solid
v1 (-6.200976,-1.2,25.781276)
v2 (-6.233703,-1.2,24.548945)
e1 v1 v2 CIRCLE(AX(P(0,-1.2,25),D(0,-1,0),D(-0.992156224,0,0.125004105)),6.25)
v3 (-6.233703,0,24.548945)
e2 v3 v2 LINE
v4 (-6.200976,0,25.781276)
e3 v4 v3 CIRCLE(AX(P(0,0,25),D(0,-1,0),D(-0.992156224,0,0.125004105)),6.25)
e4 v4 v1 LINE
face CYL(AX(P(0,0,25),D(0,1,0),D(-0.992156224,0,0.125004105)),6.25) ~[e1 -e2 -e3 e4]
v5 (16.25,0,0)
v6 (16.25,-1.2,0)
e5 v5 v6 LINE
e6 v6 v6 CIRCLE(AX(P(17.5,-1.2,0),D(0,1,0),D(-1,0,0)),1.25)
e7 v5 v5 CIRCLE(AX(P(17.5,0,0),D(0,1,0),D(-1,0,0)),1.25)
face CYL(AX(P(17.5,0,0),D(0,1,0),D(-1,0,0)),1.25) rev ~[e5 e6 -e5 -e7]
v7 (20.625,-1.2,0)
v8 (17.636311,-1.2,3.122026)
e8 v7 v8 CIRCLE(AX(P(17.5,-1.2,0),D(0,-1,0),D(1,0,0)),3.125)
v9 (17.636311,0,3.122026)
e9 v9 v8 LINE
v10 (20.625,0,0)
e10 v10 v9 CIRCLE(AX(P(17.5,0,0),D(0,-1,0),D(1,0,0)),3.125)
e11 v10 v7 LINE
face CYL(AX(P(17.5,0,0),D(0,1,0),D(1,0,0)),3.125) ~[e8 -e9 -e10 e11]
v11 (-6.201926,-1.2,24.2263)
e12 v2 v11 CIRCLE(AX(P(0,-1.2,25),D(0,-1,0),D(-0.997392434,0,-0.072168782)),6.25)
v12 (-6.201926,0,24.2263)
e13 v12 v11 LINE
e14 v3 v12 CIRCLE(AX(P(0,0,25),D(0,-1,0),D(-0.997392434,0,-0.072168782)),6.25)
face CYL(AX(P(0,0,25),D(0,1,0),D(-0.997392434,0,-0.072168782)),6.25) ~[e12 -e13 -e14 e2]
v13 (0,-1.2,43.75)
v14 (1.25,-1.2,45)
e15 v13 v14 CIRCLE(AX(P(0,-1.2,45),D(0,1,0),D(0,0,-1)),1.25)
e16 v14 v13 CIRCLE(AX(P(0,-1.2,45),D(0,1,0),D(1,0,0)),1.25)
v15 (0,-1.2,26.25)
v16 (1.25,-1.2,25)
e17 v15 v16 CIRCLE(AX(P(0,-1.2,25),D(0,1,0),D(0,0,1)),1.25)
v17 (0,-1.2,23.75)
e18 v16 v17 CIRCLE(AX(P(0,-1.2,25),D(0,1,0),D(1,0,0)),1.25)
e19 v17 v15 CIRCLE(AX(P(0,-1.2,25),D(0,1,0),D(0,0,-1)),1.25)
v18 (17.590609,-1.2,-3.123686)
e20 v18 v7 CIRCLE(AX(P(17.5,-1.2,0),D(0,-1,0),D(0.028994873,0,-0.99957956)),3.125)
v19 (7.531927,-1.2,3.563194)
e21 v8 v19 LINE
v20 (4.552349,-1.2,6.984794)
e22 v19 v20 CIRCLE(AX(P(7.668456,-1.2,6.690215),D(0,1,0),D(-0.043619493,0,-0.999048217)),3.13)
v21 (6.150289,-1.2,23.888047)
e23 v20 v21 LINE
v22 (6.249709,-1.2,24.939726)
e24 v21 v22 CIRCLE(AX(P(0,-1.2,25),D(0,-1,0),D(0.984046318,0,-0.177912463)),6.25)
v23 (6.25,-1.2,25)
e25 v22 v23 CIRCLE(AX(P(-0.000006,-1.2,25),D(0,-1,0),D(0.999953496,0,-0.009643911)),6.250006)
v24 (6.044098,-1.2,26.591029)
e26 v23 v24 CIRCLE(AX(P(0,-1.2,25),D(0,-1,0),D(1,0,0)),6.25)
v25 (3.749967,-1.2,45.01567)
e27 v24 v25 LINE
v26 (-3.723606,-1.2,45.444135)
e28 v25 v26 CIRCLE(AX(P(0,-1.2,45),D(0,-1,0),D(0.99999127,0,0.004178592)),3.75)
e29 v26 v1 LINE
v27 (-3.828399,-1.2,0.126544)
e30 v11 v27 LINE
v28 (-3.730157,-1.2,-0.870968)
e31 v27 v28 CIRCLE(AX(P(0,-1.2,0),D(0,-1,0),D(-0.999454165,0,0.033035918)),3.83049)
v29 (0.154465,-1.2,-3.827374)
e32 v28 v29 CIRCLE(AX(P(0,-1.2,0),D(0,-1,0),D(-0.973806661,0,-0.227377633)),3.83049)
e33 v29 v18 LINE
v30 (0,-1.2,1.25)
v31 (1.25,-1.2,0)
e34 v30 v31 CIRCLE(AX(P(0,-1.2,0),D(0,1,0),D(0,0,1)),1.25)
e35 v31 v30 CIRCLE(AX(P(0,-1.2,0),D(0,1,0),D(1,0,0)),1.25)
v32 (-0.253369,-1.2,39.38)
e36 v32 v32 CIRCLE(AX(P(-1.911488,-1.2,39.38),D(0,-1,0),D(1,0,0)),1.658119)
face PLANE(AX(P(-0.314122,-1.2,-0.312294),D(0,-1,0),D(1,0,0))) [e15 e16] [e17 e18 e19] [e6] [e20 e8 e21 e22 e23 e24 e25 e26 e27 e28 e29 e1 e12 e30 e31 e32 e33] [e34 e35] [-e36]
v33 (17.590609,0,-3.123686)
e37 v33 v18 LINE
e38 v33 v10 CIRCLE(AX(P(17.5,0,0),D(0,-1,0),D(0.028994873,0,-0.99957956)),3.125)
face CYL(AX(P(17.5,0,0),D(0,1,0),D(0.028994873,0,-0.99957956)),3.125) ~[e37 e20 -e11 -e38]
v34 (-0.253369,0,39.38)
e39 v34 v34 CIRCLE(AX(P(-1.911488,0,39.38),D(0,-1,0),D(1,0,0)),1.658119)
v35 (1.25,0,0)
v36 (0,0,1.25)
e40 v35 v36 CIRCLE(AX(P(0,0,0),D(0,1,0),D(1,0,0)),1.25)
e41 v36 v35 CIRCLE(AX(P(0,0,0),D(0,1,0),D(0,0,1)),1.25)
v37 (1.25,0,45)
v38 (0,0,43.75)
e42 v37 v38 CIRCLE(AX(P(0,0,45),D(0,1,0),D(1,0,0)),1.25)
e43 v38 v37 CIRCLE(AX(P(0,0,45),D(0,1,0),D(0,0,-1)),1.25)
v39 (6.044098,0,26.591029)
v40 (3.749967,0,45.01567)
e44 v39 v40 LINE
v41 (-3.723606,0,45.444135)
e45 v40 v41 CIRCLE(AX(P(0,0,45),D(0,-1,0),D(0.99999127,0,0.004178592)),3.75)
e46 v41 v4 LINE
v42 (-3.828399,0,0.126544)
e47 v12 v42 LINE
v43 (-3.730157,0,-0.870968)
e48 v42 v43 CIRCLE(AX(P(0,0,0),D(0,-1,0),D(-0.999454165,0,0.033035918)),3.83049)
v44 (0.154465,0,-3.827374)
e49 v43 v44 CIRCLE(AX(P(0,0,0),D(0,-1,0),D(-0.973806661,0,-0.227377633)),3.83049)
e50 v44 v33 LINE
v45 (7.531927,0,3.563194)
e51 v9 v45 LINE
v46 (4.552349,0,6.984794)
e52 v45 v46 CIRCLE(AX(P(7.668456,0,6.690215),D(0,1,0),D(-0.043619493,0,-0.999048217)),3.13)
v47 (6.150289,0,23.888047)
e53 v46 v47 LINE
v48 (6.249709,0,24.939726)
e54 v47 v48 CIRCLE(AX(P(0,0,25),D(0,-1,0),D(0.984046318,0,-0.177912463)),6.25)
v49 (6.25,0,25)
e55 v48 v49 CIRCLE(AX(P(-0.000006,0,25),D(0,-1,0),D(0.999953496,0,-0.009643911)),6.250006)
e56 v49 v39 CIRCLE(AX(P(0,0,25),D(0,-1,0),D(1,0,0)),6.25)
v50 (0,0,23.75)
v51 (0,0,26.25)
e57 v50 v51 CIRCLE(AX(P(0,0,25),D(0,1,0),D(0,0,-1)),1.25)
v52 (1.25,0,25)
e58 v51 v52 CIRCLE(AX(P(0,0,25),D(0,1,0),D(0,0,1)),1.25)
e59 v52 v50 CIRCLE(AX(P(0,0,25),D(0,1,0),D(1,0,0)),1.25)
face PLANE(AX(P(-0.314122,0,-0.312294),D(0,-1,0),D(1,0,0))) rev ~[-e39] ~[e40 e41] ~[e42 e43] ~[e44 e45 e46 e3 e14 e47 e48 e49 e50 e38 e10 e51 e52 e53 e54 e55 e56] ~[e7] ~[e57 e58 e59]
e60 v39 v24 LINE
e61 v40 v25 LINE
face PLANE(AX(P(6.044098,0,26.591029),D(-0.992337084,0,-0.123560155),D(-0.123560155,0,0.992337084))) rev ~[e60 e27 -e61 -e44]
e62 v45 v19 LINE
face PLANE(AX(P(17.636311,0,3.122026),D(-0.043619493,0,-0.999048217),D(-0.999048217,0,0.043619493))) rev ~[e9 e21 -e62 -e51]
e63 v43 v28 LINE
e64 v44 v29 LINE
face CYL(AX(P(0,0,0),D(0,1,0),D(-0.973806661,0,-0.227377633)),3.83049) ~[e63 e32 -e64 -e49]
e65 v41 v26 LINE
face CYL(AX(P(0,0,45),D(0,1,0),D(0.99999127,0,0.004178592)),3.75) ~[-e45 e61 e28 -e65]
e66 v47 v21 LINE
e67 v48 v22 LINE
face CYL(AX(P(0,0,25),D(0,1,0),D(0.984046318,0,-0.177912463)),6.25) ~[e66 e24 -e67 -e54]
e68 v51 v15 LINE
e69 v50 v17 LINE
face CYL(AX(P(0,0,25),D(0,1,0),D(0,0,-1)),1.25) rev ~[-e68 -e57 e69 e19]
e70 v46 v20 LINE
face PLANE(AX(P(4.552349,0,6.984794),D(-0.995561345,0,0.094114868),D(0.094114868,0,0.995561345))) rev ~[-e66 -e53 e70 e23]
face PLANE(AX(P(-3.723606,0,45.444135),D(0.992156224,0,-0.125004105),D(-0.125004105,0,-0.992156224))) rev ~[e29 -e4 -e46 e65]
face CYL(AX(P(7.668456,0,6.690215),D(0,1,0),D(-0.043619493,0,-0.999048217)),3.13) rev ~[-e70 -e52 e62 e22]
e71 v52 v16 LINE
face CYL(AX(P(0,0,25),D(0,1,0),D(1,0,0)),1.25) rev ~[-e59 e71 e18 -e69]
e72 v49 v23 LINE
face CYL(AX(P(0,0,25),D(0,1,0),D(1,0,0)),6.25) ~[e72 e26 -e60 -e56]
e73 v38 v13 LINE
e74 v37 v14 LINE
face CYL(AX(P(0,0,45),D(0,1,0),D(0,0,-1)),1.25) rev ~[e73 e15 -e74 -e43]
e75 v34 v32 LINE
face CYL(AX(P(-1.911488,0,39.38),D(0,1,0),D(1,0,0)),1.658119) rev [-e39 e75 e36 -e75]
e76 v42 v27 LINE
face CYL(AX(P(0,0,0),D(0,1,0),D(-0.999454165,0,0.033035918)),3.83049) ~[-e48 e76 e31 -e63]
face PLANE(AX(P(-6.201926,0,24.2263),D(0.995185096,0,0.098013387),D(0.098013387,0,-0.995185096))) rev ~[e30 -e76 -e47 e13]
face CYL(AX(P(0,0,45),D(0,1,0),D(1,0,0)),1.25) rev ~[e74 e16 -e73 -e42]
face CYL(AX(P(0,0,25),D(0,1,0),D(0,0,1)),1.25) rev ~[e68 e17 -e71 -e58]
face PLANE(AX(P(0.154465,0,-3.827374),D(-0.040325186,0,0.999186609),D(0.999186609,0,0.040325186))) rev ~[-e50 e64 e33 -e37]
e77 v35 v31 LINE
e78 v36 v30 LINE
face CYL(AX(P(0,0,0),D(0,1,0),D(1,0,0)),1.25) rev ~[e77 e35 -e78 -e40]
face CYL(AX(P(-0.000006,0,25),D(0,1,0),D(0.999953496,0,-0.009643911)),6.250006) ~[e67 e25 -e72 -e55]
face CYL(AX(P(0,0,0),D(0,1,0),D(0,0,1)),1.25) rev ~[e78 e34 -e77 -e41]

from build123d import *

# Parameters (mm, degrees)
F0_R     = 1.6581186228
F1_DEPTH = 1.2


with BuildPart() as f1:
    # F0 (on Front) → F1 (new body)
    with BuildSketch(Plane.XZ):
        with BuildLine():
            ThreePointArc((1.25, 0), (-0.8838834765, -0.8838834765), (0, 1.25))
            Line((0, 1.25), (0, 3.8304899347))
            ThreePointArc((0, 3.8304899347), (-2.6634496965, 2.7529418545), (-3.8283991196, 0.126543752))
            Line((-3.8283991196, 0.126543752), (-3.7301566118, -0.8709677329))
            ThreePointArc((-3.7301566118, -0.8709677329), (-2.3198010798, -3.048143056), (0.1544652488, -3.8273742471))
            ThreePointArc((0.1544652488, -3.8273742471), (2.7626373921, -2.6533917501), (3.8304899347, 0))
            Line((3.8304899347, 0), (1.25, 0))
        make_face()
        with BuildLine():
            Line((0, 3.8304899347), (0, 1.25))
            ThreePointArc((0, 1.25), (0.8838834765, 0.8838834765), (1.25, 0))
            Line((1.25, 0), (3.8304899347, 0))
            ThreePointArc((3.8304899347, 0), (2.7085654081, 2.7085654081), (0, 3.8304899347))
        make_face()
        with BuildLine():
            ThreePointArc((-3.8283991196, 0.126543752), (-2.6634496965, 2.7529418545), (0, 3.8304899347))
            Line((0, 3.8304899347), (0, 18.75))
            ThreePointArc((0, 18.75), (-4.1368389571, 20.315017242), (-6.2019261398, 24.2262996982))
            Line((-6.2019261398, 24.2262996982), (-3.8283991196, 0.126543752))
        make_face()
        with BuildLine():
            Line((0, 18.75), (0, 3.8304899347))
            ThreePointArc((0, 3.8304899347), (2.7085654081, 2.7085654081), (3.8304899347, 0))
            Line((3.8304899347, 0), (14.375, 0))
            ThreePointArc((14.375, 0), (15.3390218203, 2.257387496), (17.6363109165, 3.122025678))
            Line((17.6363109165, 3.122025678), (7.5319273502, 3.5631936653))
            ThreePointArc((7.5319273502, 3.5631936653), (5.3080013875, 4.6346970575), (4.5523493544, 6.9847941218))
            Line((4.5523493544, 6.9847941218), (6.150289486, 23.8880471063))
            ThreePointArc((6.150289486, 23.8880471063), (4.0070434496, 20.2035322587), (0, 18.75))
        make_face()
        with BuildLine():
            Line((14.375, 0), (3.8304899347, 0))
            ThreePointArc((3.8304899347, 0), (2.7626373921, -2.6533917501), (0.1544652488, -3.8273742471))
            Line((0.1544652488, -3.8273742471), (17.5906089776, -3.1236861259))
            ThreePointArc((17.5906089776, -3.1236861259), (15.3225620623, -2.2415148957), (14.375, 0))
        make_face()
        with BuildLine():
            ThreePointArc((-6.2019261398, 24.2262996982), (-4.1368389571, 20.315017242), (0, 18.75))
            Line((0, 18.75), (0, 23.75))
            ThreePointArc((0, 23.75), (-1.25, 25), (0, 26.25))
            Line((0, 26.25), (0, 31.25))
            ThreePointArc((0, 31.25), (-4.1339767257, 29.6875085527), (-6.2009764026, 25.7812756582))
            ThreePointArc((-6.2009764026, 25.7812756582), (-6.2477972764, 25.1659192352), (-6.2337027111, 24.5489451152))
            Line((-6.2337027111, 24.5489451152), (-6.2019261398, 24.2262996982))
        make_face()
        with BuildLine():
            Line((0, 23.75), (0, 18.75))
            ThreePointArc((0, 18.75), (4.0070434496, 20.2035322587), (6.150289486, 23.8880471063))
            Line((6.150289486, 23.8880471063), (6.2497093523, 24.9397255246))
            Line((6.2497093523, 24.9397255246), (6.0440984205, 26.5910293157))
            ThreePointArc((6.0440984205, 26.5910293157), (3.8156629029, 29.9500723845), (0, 31.25))
            Line((0, 31.25), (0, 26.25))
            ThreePointArc((0, 26.25), (0.8838834765, 25.8838834765), (1.25, 25))
            ThreePointArc((1.25, 25), (0.8838834765, 24.1161165235), (0, 23.75))
        make_face()
        with BuildLine():
            Line((-3.7301566118, -0.8709677329), (-3.8283991196, 0.126543752))
            ThreePointArc((-3.8283991196, 0.126543752), (-3.8120464946, -0.375439294), (-3.7301566118, -0.8709677329))
        make_face()
        with BuildLine():
            ThreePointArc((17.6363109165, 3.122025678), (15.3390218203, 2.257387496), (14.375, 0))
            ThreePointArc((14.375, 0), (15.3225620623, -2.2415148957), (17.5906089776, -3.1236861259))
            ThreePointArc((17.5906089776, -3.1236861259), (19.7415148957, -2.1774379377), (20.625, 0))
            ThreePointArc((20.625, 0), (19.757387496, 2.1609781797), (17.6363109165, 3.122025678))
        make_face()
        with BuildLine():
            ThreePointArc((18.75, 0), (17.5, -1.25), (16.25, 0))
            ThreePointArc((16.25, 0), (17.5, 1.25), (18.75, 0))
        make_face(mode=Mode.SUBTRACT)
        with BuildLine():
            ThreePointArc((-6.2337027111, 24.5489451152), (-6.2199068518, 24.3874163287), (-6.2019261398, 24.2262996982))
            Line((-6.2019261398, 24.2262996982), (-6.2337027111, 24.5489451152))
        make_face()
        with BuildLine():
            Line((6.2497093523, 24.9397255246), (6.150289486, 23.8880471063))
            ThreePointArc((6.150289486, 23.8880471063), (6.222258406, 24.4117820738), (6.2497093523, 24.9397255246))
        make_face()
        with BuildLine():
            Line((6.0440984205, 26.5910293157), (6.2497093523, 24.9397255246))
            ThreePointArc((6.2497093523, 24.9397255246), (6.2499273376, 24.9698624119), (6.25, 25))
            ThreePointArc((6.25, 25), (6.1983108638, 25.8021486371), (6.0440984205, 26.5910293157))
        make_face()
        with BuildLine():
            ThreePointArc((-6.2009764026, 25.7812756582), (-4.1339767257, 29.6875085527), (0, 31.25))
            Line((0, 31.25), (0, 39.38))
            Line((0, 39.38), (0, 41.25))
            ThreePointArc((0, 41.25), (-2.8042828873, 42.5103218104), (-3.7236063691, 45.4441346731))
            Line((-3.7236063691, 45.4441346731), (-6.2009764026, 25.7812756582))
        make_face()
        with Locations((-1.9114875467, 39.38)):
            Circle(F0_R, mode=Mode.SUBTRACT)
        with BuildLine():
            Line((0, 39.38), (0, 31.25))
            ThreePointArc((0, 31.25), (3.8156629029, 29.9500723845), (6.0440984205, 26.5910293157))
            Line((6.0440984205, 26.5910293157), (3.7499672612, 45.015669719))
            ThreePointArc((3.7499672612, 45.015669719), (3.7499918153, 45.0078348766), (3.75, 45))
            ThreePointArc((3.75, 45), (2.6516504294, 42.3483495706), (0, 41.25))
            Line((0, 41.25), (0, 39.38))
        make_face()
        with BuildLine():
            ThreePointArc((3.7499672612, 45.015669719), (0.2146375512, 48.7438523905), (-3.7236063691, 45.4441346731))
            ThreePointArc((-3.7236063691, 45.4441346731), (-2.8042828873, 42.5103218104), (0, 41.25))
            ThreePointArc((0, 41.25), (2.6516504294, 42.3483495706), (3.75, 45))
            ThreePointArc((3.75, 45), (3.7499918153, 45.0078348766), (3.7499672612, 45.015669719))
        make_face()
        with BuildLine():
            ThreePointArc((1.25, 45), (0.8838834765, 44.1161165235), (0, 43.75))
            ThreePointArc((0, 43.75), (-0.8838834765, 45.8838834765), (1.25, 45))
        make_face(mode=Mode.SUBTRACT)
    extrude(amount=F1_DEPTH)


solid = f1.part
